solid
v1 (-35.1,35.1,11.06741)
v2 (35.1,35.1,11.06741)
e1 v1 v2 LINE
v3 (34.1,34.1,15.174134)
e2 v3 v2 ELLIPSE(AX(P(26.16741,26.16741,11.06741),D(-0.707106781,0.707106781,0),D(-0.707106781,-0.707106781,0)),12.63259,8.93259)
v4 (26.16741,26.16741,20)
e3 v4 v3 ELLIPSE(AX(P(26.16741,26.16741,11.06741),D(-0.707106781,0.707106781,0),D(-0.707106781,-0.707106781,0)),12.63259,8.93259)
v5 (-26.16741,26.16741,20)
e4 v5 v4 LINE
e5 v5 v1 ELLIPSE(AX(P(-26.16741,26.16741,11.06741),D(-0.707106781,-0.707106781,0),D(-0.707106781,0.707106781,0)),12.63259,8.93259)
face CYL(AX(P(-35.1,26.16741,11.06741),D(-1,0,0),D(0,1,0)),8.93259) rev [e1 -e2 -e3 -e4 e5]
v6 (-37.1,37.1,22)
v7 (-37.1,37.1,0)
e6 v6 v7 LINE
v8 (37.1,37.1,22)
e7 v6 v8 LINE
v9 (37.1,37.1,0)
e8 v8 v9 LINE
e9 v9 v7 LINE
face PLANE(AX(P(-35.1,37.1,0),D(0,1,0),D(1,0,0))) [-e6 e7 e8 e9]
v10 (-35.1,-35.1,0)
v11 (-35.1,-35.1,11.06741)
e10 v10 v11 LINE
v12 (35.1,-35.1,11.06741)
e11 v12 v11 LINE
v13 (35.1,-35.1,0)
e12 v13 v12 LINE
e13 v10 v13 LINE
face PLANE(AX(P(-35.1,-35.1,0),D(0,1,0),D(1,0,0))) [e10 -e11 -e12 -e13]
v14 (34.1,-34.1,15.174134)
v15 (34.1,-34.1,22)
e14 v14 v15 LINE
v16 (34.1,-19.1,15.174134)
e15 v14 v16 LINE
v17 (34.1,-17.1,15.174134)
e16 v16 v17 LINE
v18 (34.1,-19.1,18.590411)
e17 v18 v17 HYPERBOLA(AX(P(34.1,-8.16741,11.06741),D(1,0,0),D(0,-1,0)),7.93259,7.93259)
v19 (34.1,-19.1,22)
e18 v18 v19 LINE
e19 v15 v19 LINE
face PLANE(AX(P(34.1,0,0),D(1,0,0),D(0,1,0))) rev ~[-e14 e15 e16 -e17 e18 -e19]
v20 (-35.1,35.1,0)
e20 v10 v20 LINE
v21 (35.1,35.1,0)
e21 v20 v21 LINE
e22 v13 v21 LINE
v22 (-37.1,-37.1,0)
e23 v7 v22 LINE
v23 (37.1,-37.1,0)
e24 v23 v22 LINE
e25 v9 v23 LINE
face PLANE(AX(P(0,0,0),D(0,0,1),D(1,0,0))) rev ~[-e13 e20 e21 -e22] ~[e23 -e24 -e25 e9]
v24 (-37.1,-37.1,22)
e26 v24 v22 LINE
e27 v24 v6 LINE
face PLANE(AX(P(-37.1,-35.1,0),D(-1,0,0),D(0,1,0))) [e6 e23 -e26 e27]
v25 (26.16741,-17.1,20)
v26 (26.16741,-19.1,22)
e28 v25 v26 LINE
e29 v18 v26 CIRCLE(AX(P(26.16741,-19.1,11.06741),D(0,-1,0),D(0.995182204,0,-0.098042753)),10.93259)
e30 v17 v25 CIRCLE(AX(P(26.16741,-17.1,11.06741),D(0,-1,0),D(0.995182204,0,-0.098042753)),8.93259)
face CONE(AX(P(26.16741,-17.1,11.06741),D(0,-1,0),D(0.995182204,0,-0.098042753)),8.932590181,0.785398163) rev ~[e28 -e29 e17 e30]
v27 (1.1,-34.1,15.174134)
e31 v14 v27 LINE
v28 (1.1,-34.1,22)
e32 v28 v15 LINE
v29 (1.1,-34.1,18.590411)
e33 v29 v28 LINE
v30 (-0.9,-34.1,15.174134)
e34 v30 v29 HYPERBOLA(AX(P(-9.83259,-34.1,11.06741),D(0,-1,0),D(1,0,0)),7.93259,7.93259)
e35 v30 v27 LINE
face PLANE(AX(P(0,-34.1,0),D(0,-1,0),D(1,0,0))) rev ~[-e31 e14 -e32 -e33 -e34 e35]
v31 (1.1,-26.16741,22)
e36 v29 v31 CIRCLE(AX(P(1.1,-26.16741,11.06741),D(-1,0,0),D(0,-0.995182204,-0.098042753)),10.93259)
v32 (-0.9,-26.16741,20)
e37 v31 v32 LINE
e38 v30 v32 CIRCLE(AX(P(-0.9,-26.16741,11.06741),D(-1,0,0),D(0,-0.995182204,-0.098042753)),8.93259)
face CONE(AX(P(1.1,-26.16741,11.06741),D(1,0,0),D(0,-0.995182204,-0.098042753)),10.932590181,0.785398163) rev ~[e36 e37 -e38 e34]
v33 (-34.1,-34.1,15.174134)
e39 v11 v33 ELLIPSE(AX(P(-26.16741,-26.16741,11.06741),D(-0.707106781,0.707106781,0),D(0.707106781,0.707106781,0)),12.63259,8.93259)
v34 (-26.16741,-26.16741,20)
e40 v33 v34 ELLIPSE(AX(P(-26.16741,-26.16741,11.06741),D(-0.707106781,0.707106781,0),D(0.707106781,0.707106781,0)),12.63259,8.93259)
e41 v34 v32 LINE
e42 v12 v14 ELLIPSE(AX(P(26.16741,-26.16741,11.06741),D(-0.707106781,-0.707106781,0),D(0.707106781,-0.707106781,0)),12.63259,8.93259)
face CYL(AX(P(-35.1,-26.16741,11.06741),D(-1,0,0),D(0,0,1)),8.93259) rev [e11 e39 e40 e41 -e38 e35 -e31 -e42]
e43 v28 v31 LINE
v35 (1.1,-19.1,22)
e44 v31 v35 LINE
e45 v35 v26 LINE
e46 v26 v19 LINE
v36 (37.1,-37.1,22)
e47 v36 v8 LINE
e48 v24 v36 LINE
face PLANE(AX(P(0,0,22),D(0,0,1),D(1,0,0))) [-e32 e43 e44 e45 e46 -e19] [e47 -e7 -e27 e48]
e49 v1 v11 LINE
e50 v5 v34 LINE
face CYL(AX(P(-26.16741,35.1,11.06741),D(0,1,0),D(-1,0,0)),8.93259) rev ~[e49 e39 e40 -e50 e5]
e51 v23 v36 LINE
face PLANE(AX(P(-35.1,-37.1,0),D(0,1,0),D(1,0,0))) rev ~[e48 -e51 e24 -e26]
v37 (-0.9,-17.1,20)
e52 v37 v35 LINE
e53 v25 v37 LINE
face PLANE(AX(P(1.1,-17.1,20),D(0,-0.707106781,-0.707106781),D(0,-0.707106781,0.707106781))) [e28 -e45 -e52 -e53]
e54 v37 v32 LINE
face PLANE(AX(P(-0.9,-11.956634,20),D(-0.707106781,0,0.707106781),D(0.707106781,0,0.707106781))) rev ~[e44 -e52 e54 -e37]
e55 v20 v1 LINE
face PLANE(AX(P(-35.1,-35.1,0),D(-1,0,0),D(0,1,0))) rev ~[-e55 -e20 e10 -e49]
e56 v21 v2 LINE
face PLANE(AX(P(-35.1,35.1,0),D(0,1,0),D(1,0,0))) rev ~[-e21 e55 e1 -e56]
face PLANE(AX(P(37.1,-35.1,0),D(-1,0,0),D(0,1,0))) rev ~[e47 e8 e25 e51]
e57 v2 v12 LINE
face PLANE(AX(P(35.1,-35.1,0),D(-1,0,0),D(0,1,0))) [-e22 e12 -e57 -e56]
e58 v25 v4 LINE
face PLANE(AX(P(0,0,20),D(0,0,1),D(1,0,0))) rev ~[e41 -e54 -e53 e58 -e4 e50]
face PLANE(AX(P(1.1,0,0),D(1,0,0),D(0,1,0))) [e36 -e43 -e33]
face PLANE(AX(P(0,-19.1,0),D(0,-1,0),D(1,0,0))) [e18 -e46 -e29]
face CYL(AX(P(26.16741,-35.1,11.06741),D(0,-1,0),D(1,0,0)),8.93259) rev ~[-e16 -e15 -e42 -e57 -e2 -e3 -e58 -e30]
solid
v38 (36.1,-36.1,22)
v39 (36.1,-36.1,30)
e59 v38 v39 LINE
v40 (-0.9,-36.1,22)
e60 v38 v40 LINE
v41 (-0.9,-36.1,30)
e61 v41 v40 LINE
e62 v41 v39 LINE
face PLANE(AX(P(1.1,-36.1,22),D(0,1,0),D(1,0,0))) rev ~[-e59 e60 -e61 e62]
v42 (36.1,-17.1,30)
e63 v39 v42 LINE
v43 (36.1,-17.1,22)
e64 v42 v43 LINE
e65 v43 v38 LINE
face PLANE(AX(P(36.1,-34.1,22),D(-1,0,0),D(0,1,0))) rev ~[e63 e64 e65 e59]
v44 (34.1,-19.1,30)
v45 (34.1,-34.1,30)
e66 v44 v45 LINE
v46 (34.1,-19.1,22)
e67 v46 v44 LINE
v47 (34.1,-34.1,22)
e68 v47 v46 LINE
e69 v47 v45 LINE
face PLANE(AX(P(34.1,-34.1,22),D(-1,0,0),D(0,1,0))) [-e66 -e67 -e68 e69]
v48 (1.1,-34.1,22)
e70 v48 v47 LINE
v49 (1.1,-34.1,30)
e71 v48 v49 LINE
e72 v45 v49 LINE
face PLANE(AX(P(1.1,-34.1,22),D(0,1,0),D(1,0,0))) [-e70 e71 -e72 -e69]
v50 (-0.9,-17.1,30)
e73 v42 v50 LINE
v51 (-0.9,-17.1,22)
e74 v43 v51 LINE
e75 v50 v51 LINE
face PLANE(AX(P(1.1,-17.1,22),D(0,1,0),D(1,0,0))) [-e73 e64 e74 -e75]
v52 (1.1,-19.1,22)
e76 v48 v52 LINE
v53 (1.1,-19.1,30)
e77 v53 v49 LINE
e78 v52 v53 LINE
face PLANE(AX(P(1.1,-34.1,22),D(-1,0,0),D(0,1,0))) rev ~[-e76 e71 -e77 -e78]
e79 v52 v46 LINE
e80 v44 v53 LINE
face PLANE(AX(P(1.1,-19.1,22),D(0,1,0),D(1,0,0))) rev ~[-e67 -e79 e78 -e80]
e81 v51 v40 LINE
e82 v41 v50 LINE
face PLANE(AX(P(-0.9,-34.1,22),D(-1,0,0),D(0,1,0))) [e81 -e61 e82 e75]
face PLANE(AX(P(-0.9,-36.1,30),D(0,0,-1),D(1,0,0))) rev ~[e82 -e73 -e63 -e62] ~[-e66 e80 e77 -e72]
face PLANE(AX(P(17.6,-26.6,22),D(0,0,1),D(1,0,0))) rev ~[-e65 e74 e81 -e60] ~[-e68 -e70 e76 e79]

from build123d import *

# Parameters (mm, degrees)
F0_W          = 70.2
F0_H          = 70.2
F1_DEPTH      = 20
F2_T          = 2
F3_W          = 33
F3_H          = 15
F4_DEPTH      = 25
F5_DEPTH      = 25
F6_T          = 2
F7_W          = 2
F7_H          = 6.9346216321
F7_W_2        = 33
F7_H_2        = 10.0653783679
F8_DEPTH      = 25
F9_T1_DEPTH   = 70.2
F9_T3_DEPTH   = 70.2
F9_T8_DEPTH   = 70.2
F9_T14_DEPTH  = 70.2
F9_T20_DEPTH  = 70.2
F9_T27_DEPTH  = 70.2
F9_T33_DEPTH  = 70.2
F9_T39_DEPTH  = 70.2
F9_T45_DEPTH  = 70.2
F9_T51_DEPTH  = 70.2
F9_T58_DEPTH  = 70.2
F9_T64_DEPTH  = 70.2
F10_T1_DEPTH  = 25.0674098192
F10_T6_ANGLE  = 95.6264745755
F10_T11_ANGLE = 95.6264745755
F10_T16_DEPTH = 14.2107757951


# Not quite as in the source:
# - a fillet or chamfer that OpenCascade refuses, or shapes differently, is made with other operations: its cross-section is extruded or revolved along the edge and cut away or added


with BuildPart() as f1:
    # F0 (on Top) → F1 (new body)
    with BuildSketch(Plane.XY):
        Rectangle(F0_W, F0_H)
    extrude(amount=F1_DEPTH)

    # F2
    f2_openings = [f1.faces().sort_by_distance(p)[0] for p in [
        (0, 0, 0),
    ]]
    offset(amount=F2_T, openings=f2_openings, kind=Kind.INTERSECTION)

    # F3 (on face) → F4 (cut)
    with BuildSketch(Plane.XY.offset(22)):
        with Locations((17.6, -26.6)):
            Rectangle(F3_W, F3_H)
    extrude(amount=-F4_DEPTH, mode=Mode.SUBTRACT)

    # F9: fillet of radius 8.9325901808 on 4 edges, made by hand

    # F9_s2 → F9_t1 (join)
    with BuildSketch(Plane.YZ.offset(-35.1)):
        with BuildLine():
            ThreePointArc((35.1, 11.0674098192), (32.4837049096, 17.3837049096), (26.1674098192, 20))
            Line((26.1674098192, 20), (35.1, 20))
            Line((35.1, 20), (35.1, 11.0674098192))
        make_face()
    extrude(amount=F9_T1_DEPTH)

    # F9_s4 → F9_t3 (join)
    with BuildSketch(Plane.XZ.offset(-35.1)):
        with BuildLine():
            ThreePointArc((-35.1, 11.0674098192), (-32.4837049096, 17.3837049096), (-26.1674098192, 20))
            Line((-26.1674098192, 20), (-35.1, 20))
            Line((-35.1, 20), (-35.1, 11.0674098192))
        make_face()
    extrude(amount=F9_T3_DEPTH)


with BuildPart() as f5:
    # F3 (on face) → F5 (new body)
    with BuildSketch(Plane.XY.offset(22)):
        with Locations((17.6, -26.6)):
            Rectangle(F3_W, F3_H)
    extrude(amount=F5_DEPTH)

    # F6
    f6_openings = [f5.faces().sort_by_distance(p)[0] for p in [
        (17.6, -26.6, 22),
    ]]
    offset(amount=F6_T, openings=f6_openings, kind=Kind.INTERSECTION)

    # F7 (on face) → F8 (cut)
    with BuildSketch(Plane.XZ.offset(36.1)):
        with Locations((0.1, 33.467310816)):
            Rectangle(F7_W, F7_H)
        with Locations((17.6, 33.467310816)):
            Rectangle(F7_W_2, F7_H)
        Polygon((-0.9, 49), (-0.9, 36.9346216321), (1.1, 36.9346216321), (1.1, 47), (34.1, 47), (34.1, 36.9346216321), (36.1, 36.9346216321), (36.1, 49), align=None)
        with Locations((35.1, 33.467310816)):
            Rectangle(F7_W, F7_H)
        with Locations((17.6, 41.967310816)):
            Rectangle(F7_W_2, F7_H_2)
    extrude(amount=-F8_DEPTH, mode=Mode.SUBTRACT)


with BuildPart() as f9_tool6:
    # F9_s7 → F9_t8 (new body)
    with BuildSketch(Plane.XZ.offset(35.1)):
        with BuildLine():
            ThreePointArc((35.1, 11.0674098192), (32.4837049096, 17.3837049096), (26.1674098192, 20))
            Line((26.1674098192, 20), (35.1, 20))
            Line((35.1, 20), (35.1, 11.0674098192))
        make_face()
    extrude(amount=-F9_T8_DEPTH)

    split(bisect_by=Plane.XZ.offset(34.1), keep=Keep.TOP)

    split(bisect_by=Plane.YZ.offset(34.1), keep=Keep.TOP)


with BuildPart() as f1_1:
    add(f1.part)

    # F9_t5: union F9_tool6
    add(f9_tool6.part)


with BuildPart() as f9_tool12:
    # F9_s13 → F9_t14 (new body)
    with BuildSketch(Plane.XZ.offset(35.1)):
        with BuildLine():
            ThreePointArc((35.1, 11.0674098192), (32.4837049096, 17.3837049096), (26.1674098192, 20))
            Line((26.1674098192, 20), (35.1, 20))
            Line((35.1, 20), (35.1, 11.0674098192))
        make_face()
    extrude(amount=-F9_T14_DEPTH)

    split(bisect_by=Plane.XZ.offset(34.1), keep=Keep.TOP)

    split(bisect_by=Plane.YZ.offset(34.1), keep=Keep.BOTTOM)


with BuildPart() as f1_2:
    add(f1_1.part)

    # F9_t11: union F9_tool12
    add(f9_tool12.part)


with BuildPart() as f9_tool18:
    # F9_s19 → F9_t20 (new body)
    with BuildSketch(Plane.XZ.offset(35.1)):
        with BuildLine():
            ThreePointArc((35.1, 11.0674098192), (32.4837049096, 17.3837049096), (26.1674098192, 20))
            Line((26.1674098192, 20), (35.1, 20))
            Line((35.1, 20), (35.1, 11.0674098192))
        make_face()
    extrude(amount=-F9_T20_DEPTH)

    split(bisect_by=Plane.XZ.offset(19.1), keep=Keep.TOP)

    split(bisect_by=Plane.XZ.offset(34.1), keep=Keep.BOTTOM)

    split(bisect_by=Plane.YZ.offset(34.1), keep=Keep.TOP)


with BuildPart() as f1_3:
    add(f1_2.part)

    # F9_t17: union F9_tool18
    add(f9_tool18.part)


with BuildPart() as f9_tool25:
    # F9_s26 → F9_t27 (new body)
    with BuildSketch(Plane.XZ.offset(35.1)):
        with BuildLine():
            ThreePointArc((35.1, 11.0674098192), (32.4837049096, 17.3837049096), (26.1674098192, 20))
            Line((26.1674098192, 20), (35.1, 20))
            Line((35.1, 20), (35.1, 11.0674098192))
        make_face()
    extrude(amount=-F9_T27_DEPTH)

    split(bisect_by=Plane.XZ.offset(19.1), keep=Keep.BOTTOM)

    split(bisect_by=Plane.YZ.offset(34.1), keep=Keep.TOP)


with BuildPart() as f1_4:
    add(f1_3.part)

    # F9_t24: union F9_tool25
    add(f9_tool25.part)


with BuildPart() as f9_tool31:
    # F9_s32 → F9_t33 (new body)
    with BuildSketch(Plane.XZ.offset(35.1)):
        with BuildLine():
            ThreePointArc((35.1, 11.0674098192), (32.4837049096, 17.3837049096), (26.1674098192, 20))
            Line((26.1674098192, 20), (35.1, 20))
            Line((35.1, 20), (35.1, 11.0674098192))
        make_face()
    extrude(amount=-F9_T33_DEPTH)

    split(bisect_by=Plane.XZ.offset(19.1), keep=Keep.BOTTOM)

    split(bisect_by=Plane.YZ.offset(34.1), keep=Keep.BOTTOM)


with BuildPart() as f1_5:
    add(f1_4.part)

    # F9_t30: union F9_tool31
    add(f9_tool31.part)


with BuildPart() as f9_tool37:
    # F9_s38 → F9_t39 (new body)
    with BuildSketch(Plane.YZ.offset(-35.1)):
        with BuildLine():
            ThreePointArc((-26.1674098192, 20), (-32.4837049096, 17.3837049096), (-35.1, 11.0674098192))
            Line((-35.1, 11.0674098192), (-35.1, 20))
            Line((-35.1, 20), (-26.1674098192, 20))
        make_face()
    extrude(amount=F9_T39_DEPTH)

    split(bisect_by=Plane.YZ.offset(1.1), keep=Keep.BOTTOM)

    split(bisect_by=Plane.XZ.offset(34.1), keep=Keep.BOTTOM)


with BuildPart() as f1_6:
    add(f1_5.part)

    # F9_t36: union F9_tool37
    add(f9_tool37.part)


with BuildPart() as f9_tool43:
    # F9_s44 → F9_t45 (new body)
    with BuildSketch(Plane.YZ.offset(-35.1)):
        with BuildLine():
            ThreePointArc((-26.1674098192, 20), (-32.4837049096, 17.3837049096), (-35.1, 11.0674098192))
            Line((-35.1, 11.0674098192), (-35.1, 20))
            Line((-35.1, 20), (-26.1674098192, 20))
        make_face()
    extrude(amount=F9_T45_DEPTH)

    split(bisect_by=Plane.YZ.offset(1.1), keep=Keep.BOTTOM)

    split(bisect_by=Plane.XZ.offset(34.1), keep=Keep.TOP)


with BuildPart() as f1_7:
    add(f1_6.part)

    # F9_t42: union F9_tool43
    add(f9_tool43.part)


with BuildPart() as f9_tool49:
    # F9_s50 → F9_t51 (new body)
    with BuildSketch(Plane.YZ.offset(-35.1)):
        with BuildLine():
            ThreePointArc((-26.1674098192, 20), (-32.4837049096, 17.3837049096), (-35.1, 11.0674098192))
            Line((-35.1, 11.0674098192), (-35.1, 20))
            Line((-35.1, 20), (-26.1674098192, 20))
        make_face()
    extrude(amount=F9_T51_DEPTH)

    split(bisect_by=Plane.YZ.offset(1.1), keep=Keep.TOP)

    split(bisect_by=Plane.XZ.offset(34.1), keep=Keep.TOP)

    split(bisect_by=Plane.YZ.offset(34.1), keep=Keep.BOTTOM)


with BuildPart() as f1_8:
    add(f1_7.part)

    # F9_t48: union F9_tool49
    add(f9_tool49.part)


with BuildPart() as f9_tool56:
    # F9_s57 → F9_t58 (new body)
    with BuildSketch(Plane.YZ.offset(-35.1)):
        with BuildLine():
            ThreePointArc((-26.1674098192, 20), (-32.4837049096, 17.3837049096), (-35.1, 11.0674098192))
            Line((-35.1, 11.0674098192), (-35.1, 20))
            Line((-35.1, 20), (-26.1674098192, 20))
        make_face()
    extrude(amount=F9_T58_DEPTH)

    split(bisect_by=Plane.XZ.offset(34.1), keep=Keep.BOTTOM)

    split(bisect_by=Plane.YZ.offset(34.1), keep=Keep.TOP)


with BuildPart() as f1_9:
    add(f1_8.part)

    # F9_t55: union F9_tool56
    add(f9_tool56.part)


with BuildPart() as f9_tool62:
    # F9_s63 → F9_t64 (new body)
    with BuildSketch(Plane.YZ.offset(-35.1)):
        with BuildLine():
            ThreePointArc((-26.1674098192, 20), (-32.4837049096, 17.3837049096), (-35.1, 11.0674098192))
            Line((-35.1, 11.0674098192), (-35.1, 20))
            Line((-35.1, 20), (-26.1674098192, 20))
        make_face()
    extrude(amount=F9_T64_DEPTH)

    split(bisect_by=Plane.XZ.offset(34.1), keep=Keep.TOP)

    split(bisect_by=Plane.YZ.offset(34.1), keep=Keep.TOP)


with BuildPart() as f1_10:
    add(f1_9.part)

    # F9_t61: union F9_tool62
    add(f9_tool62.part)

    # F10: chamfer of 2 on 6 edges, made by hand

    # F10_s2 → F10_t1 (cut)
    with BuildSketch(Plane.YZ.offset(1.1)):
        Polygon((-17.1, 20), (-19.1, 22), (-19.1, 20), align=None)
    extrude(amount=F10_T1_DEPTH, mode=Mode.SUBTRACT)


with BuildPart() as f10_tool4:
    # F10_s5 → F10_t6 (revolve)
    with BuildSketch(Plane(origin=(1.331382753, 0, 13.5141903658), x_dir=(0, 1, 0), z_dir=(-0.0980427526, 0, -0.9951822038))):
        Polygon((-17.1, 33.8888514287), (-19.1, 35.8888514287), (-19.1, 33.8888514287), align=None)
    revolve(axis=Axis((26.1674098192, -19.1, 11.0674098192), (0, -1, 0)), revolution_arc=F10_T6_ANGLE)

    split(bisect_by=Plane.YZ.offset(34.1), keep=Keep.BOTTOM)


with BuildPart() as f1_11:
    add(f1_10.part)

    # F10_t3: cut F10_tool4
    add(f10_tool4.part, mode=Mode.SUBTRACT)


with BuildPart() as f10_tool9:
    # F10_s10 → F10_t11 (revolve)
    with BuildSketch(Plane(origin=(0, -1.331382753, 13.5141903658), x_dir=(1, 0, 0), z_dir=(0, 0.0980427526, -0.9951822038))):
        Polygon((1.1, 35.8888514287), (-0.9, 33.8888514287), (1.1, 33.8888514287), align=None)
    revolve(axis=Axis((1.1, -26.1674098192, 11.0674098192), (-1, 0, 0)), revolution_arc=F10_T11_ANGLE)

    split(bisect_by=Plane.XZ.offset(34.1), keep=Keep.BOTTOM)


with BuildPart() as f1_12:
    add(f1_11.part)

    # F10_t8: cut F10_tool9
    add(f10_tool9.part, mode=Mode.SUBTRACT)


with BuildPart() as f10_tool14:
    # F10_s15 → F10_t16 (new body)
    with BuildSketch(Plane.XZ.offset(11.9566340241)):
        Polygon((-0.9, 20), (1.1, 22), (1.1, 20), align=None)
    extrude(amount=F10_T16_DEPTH)

    split(bisect_by=Plane(origin=(0, 1.45, 1.45), x_dir=(1, 0, 0), z_dir=(0, -0.7071067812, -0.7071067812)), keep=Keep.TOP)


with BuildPart() as f1_13:
    add(f1_12.part)

    # F10_t13: cut F10_tool14
    add(f10_tool14.part, mode=Mode.SUBTRACT)


solid = Compound([f5.part, f1_13.part])
